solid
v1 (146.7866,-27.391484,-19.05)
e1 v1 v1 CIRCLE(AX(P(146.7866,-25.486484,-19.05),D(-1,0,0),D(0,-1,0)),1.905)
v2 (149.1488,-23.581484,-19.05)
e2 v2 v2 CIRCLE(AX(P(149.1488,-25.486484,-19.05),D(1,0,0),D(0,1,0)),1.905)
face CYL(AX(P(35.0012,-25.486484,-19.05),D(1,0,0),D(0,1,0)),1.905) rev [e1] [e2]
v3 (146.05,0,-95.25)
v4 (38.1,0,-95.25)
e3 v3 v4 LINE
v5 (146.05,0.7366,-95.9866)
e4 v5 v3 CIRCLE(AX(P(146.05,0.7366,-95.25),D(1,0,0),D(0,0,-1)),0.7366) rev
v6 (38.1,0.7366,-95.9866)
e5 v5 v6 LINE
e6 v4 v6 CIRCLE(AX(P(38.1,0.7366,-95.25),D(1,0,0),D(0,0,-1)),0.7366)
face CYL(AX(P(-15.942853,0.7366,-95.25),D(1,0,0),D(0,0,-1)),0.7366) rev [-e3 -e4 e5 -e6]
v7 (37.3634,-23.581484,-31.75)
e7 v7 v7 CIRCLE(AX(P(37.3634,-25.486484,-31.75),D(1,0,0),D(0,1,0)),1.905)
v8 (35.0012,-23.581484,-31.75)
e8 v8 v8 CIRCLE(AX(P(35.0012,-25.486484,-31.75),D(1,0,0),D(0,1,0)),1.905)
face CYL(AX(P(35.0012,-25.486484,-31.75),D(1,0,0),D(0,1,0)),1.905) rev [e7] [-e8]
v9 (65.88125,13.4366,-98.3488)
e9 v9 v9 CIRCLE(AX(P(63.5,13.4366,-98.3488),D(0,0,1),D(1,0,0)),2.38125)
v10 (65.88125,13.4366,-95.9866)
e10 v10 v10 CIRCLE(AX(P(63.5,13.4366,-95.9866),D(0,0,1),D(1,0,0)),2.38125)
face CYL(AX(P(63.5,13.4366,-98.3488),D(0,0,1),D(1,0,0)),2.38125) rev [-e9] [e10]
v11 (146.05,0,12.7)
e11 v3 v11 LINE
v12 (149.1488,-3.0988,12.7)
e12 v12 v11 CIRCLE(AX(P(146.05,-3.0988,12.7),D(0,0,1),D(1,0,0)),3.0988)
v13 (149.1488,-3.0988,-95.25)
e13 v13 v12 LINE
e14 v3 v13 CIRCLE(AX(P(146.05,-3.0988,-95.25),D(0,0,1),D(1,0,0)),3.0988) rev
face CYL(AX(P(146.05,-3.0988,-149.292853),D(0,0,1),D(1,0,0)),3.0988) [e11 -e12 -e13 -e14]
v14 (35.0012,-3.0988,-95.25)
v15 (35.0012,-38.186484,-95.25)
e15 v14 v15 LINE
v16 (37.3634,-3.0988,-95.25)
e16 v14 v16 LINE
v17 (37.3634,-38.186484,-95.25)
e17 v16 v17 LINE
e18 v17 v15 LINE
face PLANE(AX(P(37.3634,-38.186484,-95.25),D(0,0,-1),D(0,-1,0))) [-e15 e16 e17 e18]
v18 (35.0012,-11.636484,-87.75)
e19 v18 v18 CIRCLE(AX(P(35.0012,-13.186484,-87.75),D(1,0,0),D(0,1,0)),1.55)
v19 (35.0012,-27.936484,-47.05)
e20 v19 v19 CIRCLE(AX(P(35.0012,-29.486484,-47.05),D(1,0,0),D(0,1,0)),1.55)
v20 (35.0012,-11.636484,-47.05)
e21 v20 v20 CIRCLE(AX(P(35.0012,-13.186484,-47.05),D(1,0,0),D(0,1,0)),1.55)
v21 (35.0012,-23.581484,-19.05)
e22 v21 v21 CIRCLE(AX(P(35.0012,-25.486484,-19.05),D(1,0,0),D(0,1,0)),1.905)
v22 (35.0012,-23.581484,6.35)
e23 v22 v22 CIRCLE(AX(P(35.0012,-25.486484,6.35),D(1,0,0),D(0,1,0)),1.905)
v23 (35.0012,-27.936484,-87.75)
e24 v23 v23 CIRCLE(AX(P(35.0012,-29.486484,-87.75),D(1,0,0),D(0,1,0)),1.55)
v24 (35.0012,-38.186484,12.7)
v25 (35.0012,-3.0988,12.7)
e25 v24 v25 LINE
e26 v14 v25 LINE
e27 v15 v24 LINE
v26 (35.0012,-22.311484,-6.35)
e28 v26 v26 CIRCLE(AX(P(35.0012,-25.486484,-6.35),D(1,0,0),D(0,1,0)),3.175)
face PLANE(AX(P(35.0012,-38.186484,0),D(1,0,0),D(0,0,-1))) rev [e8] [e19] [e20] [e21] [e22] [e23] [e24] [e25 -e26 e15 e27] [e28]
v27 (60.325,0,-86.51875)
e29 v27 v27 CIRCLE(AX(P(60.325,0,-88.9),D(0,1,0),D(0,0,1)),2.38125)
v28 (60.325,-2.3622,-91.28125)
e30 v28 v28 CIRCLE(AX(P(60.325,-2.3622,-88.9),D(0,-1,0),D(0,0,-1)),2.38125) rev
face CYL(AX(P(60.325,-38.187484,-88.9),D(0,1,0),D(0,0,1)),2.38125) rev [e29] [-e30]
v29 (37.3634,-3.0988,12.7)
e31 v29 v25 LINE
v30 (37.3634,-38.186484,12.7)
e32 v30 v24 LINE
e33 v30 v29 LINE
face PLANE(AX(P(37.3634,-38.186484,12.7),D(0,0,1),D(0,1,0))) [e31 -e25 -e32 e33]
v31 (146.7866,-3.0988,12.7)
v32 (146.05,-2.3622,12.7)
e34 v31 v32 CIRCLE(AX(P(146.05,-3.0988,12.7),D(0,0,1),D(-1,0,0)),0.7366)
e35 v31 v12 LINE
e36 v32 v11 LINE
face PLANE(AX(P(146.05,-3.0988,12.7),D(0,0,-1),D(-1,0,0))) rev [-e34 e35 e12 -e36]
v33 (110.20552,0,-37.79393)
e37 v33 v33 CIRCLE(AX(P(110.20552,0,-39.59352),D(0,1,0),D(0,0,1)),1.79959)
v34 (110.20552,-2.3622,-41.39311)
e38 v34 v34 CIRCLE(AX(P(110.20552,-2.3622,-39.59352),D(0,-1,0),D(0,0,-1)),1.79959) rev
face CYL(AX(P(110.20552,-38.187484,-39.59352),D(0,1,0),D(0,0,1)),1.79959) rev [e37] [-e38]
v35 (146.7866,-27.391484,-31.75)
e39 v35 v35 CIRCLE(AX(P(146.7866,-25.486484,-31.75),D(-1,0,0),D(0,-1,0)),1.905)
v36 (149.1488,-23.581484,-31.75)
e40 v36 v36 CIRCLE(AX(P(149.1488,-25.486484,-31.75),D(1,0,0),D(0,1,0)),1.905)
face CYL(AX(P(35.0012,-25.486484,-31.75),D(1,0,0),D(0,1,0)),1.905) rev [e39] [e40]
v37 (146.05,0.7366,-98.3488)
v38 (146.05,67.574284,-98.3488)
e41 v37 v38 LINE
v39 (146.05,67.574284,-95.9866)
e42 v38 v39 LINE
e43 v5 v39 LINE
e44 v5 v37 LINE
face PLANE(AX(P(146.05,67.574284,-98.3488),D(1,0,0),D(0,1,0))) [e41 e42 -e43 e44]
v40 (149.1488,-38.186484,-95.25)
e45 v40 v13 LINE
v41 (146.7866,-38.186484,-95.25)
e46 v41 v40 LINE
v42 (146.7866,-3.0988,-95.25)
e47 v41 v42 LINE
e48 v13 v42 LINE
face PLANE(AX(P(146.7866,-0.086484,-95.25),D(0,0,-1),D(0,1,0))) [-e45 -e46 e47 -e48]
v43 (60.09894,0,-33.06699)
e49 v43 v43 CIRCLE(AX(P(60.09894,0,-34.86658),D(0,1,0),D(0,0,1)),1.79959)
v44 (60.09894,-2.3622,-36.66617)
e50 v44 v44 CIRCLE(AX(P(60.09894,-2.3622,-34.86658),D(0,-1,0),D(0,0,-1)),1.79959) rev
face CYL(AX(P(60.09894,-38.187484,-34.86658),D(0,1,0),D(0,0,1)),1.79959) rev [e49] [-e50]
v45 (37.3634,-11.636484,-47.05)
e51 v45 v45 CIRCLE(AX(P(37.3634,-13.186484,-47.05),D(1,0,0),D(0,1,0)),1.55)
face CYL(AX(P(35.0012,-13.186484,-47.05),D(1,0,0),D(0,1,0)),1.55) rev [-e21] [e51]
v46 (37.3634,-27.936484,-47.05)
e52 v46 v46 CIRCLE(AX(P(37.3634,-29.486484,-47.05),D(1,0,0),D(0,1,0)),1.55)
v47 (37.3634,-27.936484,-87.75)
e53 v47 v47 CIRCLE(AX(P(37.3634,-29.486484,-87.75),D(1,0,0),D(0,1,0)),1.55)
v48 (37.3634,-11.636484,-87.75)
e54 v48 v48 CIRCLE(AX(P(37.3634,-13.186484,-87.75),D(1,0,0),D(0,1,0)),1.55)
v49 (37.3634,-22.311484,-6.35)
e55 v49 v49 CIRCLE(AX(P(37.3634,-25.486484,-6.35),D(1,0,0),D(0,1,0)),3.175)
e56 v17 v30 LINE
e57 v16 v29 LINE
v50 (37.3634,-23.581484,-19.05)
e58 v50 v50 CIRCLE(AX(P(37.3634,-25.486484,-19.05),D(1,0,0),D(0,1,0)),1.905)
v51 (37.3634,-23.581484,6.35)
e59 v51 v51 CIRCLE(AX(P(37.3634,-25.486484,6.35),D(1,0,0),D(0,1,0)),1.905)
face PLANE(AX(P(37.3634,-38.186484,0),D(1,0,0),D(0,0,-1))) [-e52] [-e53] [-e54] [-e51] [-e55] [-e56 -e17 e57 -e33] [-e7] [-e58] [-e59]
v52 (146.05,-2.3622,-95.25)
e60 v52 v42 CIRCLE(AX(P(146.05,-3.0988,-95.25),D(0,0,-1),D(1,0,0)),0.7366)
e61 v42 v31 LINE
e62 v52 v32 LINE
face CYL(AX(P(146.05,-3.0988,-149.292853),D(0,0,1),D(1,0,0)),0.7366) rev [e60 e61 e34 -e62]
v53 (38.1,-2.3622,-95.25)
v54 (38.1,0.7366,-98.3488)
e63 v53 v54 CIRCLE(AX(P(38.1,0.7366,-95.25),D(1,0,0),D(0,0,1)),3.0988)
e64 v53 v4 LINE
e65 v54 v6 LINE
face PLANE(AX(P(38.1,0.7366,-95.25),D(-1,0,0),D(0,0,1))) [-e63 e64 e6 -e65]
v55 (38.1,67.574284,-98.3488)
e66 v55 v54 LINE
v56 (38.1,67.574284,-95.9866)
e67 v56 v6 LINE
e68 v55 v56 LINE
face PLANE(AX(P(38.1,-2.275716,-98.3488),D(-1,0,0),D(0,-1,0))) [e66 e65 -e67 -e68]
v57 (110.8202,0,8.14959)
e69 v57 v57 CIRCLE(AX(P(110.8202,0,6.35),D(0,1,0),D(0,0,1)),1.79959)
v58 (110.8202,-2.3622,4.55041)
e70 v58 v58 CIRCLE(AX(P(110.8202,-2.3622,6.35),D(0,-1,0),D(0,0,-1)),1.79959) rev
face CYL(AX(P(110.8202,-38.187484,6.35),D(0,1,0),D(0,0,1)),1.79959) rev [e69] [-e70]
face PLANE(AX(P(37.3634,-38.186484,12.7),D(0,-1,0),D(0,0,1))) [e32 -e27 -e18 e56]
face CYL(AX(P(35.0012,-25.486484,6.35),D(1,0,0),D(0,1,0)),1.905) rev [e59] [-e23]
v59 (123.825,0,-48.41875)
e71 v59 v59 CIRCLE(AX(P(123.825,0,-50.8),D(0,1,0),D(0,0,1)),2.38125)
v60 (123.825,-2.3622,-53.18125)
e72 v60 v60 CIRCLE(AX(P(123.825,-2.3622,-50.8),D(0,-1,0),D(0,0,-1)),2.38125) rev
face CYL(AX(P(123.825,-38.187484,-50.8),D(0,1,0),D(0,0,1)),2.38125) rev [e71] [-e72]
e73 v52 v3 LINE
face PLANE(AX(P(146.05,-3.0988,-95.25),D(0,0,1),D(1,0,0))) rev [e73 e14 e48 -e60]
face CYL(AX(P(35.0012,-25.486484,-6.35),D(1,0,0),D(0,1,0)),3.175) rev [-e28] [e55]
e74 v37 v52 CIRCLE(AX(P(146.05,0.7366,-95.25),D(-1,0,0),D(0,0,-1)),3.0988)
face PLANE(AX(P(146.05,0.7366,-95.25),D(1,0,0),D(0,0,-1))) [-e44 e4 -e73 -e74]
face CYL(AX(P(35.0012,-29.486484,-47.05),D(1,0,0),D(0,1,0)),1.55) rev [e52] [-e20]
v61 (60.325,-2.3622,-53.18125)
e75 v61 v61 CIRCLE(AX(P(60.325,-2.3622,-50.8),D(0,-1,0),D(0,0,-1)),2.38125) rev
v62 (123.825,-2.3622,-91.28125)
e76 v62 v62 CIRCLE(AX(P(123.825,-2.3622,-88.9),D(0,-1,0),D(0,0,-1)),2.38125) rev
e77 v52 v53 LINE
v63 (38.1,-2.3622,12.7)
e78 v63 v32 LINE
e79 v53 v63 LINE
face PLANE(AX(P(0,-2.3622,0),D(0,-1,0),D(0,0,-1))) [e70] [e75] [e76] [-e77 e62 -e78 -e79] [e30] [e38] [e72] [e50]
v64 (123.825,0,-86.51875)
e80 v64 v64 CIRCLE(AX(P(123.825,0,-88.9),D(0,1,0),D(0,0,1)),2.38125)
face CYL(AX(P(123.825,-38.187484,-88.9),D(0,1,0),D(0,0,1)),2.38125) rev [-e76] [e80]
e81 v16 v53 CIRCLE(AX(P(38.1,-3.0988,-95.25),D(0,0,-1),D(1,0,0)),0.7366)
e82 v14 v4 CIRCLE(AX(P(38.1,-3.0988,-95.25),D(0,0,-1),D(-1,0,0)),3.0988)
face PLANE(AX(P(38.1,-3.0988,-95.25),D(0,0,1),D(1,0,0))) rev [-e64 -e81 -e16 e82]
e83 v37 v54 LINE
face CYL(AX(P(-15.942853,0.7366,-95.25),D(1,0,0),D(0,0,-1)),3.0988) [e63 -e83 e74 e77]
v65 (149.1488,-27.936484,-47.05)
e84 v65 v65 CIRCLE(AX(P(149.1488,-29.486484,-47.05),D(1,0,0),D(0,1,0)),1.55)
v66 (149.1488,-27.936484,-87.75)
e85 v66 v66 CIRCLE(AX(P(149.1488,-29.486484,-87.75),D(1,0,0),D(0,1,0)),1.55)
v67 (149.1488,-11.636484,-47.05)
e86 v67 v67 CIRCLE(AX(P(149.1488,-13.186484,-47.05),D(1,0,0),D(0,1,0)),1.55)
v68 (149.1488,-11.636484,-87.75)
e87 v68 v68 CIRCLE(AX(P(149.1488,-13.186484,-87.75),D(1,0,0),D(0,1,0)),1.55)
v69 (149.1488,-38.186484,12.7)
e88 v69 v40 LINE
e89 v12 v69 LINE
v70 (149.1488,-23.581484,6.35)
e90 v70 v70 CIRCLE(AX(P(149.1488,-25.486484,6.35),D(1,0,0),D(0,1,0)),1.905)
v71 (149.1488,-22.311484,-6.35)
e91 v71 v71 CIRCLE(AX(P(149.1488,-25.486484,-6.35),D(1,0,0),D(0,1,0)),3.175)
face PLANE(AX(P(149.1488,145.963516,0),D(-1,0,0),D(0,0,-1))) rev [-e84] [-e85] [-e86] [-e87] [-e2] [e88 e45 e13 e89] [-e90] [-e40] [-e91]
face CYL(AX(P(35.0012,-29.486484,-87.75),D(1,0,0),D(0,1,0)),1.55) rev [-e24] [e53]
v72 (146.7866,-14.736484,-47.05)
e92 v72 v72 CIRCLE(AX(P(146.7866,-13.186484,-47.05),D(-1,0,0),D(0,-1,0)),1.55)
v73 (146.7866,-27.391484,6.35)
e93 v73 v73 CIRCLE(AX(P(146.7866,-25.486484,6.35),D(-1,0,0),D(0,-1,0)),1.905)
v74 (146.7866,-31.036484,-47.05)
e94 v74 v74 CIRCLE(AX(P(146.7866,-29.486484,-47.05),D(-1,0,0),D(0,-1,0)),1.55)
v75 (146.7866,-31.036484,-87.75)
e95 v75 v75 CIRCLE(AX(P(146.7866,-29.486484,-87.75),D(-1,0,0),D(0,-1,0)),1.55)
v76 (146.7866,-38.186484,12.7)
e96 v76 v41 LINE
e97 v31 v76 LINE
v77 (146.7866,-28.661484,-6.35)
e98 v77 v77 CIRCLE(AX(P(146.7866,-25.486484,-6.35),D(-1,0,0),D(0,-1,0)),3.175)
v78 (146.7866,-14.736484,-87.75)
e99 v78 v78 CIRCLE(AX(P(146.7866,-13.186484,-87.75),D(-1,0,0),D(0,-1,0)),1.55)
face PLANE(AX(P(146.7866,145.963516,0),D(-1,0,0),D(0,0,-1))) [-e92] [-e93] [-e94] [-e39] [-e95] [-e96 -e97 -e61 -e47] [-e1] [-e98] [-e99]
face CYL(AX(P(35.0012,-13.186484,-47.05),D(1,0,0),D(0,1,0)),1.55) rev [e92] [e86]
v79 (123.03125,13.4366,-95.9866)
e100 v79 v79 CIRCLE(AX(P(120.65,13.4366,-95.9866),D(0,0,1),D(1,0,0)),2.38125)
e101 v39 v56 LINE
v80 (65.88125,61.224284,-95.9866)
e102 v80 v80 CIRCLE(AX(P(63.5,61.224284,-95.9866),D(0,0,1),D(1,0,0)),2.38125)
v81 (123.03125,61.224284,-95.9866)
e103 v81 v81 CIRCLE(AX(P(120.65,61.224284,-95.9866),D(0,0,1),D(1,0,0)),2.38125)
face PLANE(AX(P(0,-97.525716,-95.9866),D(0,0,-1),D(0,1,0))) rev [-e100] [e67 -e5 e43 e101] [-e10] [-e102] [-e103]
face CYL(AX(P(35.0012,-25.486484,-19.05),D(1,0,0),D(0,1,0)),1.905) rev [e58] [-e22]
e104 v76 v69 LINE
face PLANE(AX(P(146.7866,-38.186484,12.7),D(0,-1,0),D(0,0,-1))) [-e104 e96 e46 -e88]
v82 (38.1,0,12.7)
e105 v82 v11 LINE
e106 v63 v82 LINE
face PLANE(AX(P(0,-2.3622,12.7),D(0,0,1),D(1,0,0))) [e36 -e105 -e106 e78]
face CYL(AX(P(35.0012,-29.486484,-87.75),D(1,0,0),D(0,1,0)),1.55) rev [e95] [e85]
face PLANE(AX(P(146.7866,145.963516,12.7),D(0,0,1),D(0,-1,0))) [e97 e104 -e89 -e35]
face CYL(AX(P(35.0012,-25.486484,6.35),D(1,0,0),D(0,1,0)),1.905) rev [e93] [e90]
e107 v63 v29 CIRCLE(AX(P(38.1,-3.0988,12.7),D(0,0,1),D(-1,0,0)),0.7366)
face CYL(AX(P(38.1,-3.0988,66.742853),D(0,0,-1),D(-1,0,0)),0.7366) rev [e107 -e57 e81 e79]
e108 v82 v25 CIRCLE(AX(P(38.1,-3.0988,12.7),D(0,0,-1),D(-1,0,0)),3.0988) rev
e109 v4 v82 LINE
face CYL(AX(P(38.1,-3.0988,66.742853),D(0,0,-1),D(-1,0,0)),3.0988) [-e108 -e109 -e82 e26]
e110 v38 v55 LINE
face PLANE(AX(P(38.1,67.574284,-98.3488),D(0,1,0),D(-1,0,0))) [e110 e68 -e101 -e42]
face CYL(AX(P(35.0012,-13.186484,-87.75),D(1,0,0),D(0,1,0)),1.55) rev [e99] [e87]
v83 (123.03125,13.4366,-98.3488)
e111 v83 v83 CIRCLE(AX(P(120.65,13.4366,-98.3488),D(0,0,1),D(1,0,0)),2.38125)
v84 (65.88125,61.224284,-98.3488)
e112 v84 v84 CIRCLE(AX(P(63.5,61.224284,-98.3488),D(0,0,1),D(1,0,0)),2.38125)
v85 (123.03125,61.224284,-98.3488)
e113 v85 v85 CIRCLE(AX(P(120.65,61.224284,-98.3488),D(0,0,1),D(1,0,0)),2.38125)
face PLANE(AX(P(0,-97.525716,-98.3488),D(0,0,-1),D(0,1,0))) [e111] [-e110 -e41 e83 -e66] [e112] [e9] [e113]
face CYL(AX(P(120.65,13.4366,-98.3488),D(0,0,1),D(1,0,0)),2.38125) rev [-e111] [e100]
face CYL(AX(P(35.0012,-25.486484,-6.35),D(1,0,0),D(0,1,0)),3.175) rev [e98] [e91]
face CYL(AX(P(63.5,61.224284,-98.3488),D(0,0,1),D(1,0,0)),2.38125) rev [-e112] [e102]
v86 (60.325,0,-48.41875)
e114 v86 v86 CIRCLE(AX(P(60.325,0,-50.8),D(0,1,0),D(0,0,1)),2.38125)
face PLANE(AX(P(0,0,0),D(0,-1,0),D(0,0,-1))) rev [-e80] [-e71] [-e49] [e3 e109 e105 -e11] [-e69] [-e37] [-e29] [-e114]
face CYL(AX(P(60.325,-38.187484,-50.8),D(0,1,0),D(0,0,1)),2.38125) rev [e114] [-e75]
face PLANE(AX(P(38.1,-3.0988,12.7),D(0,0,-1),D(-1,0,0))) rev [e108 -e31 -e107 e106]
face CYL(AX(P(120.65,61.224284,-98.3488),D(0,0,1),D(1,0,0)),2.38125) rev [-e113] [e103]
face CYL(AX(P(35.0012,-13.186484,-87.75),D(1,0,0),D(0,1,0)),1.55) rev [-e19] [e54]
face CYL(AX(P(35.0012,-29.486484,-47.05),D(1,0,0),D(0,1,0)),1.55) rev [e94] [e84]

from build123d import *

# Parameters (mm, degrees)
BASE_FLANGE2_DEPTH     = 2.3622
SKETCHED_START         = -95.25
SKETCHED_BEND2_DEPTH   = 107.95
SKETCHED_BEND2_2_DEPTH = 107.95
SKETCHED_START_2       = 38.1
SKETCHED_BEND3_DEPTH   = 107.95
SKETCHED_BEND3_2_DEPTH = 107.95
SKETCH15_R             = 3.175
SKETCH15_R_2           = 1.905
SKETCH15_R_3           = 1.55
CUT_EXTRUDE1_DEPTH     = 166.131598701
SKETCH16_R             = 2.38125
CUT_EXTRUDE2_DEPTH     = 197.530978228
CUT_EXTRUDE3_REACH     = 193.008
SKETCH18_R             = 2.38125
SKETCH18_R_2           = 1.79959


# Read off the part's stored shape, not the designer's step: Sketched Bend2, Sketched Bend3
# Sheet-metal steps are written as plain solids
with BuildPart() as part:
    # Sketch7 → Base-Flange2 (new body)
    with BuildSketch(Plane(origin=(0, 0, 0), x_dir=(1, 0, 0), z_dir=(0, 1, 0))):
        Polygon((38.1, 95.25), (38.1, 165.1), (146.05, 165.1), (146.05, 95.25), (184.15, 95.25), (184.15, -12.7), (0, -12.7), (0, 95.25), align=None)
    extrude(amount=-BASE_FLANGE2_DEPTH)

    # Sketched Bend2 outline → Sketched Bend2 (cut)
    with BuildSketch(Plane.XY.offset(SKETCHED_START)):
        with BuildLine():
            Line((0, -2.3622), (35.090019621, -2.3622))
            ThreePointArc((35.090019621, -2.3622), (36.186889266, -0.661061548), (38.1, 0))
            Line((38.1, 0), (0, 0))
            Line((0, 0), (0, -2.3622))
        make_face()
        with BuildLine():
            ThreePointArc((146.05, 0), (147.963110734, -0.661061548), (149.059980379, -2.3622))
            Line((149.059980379, -2.3622), (184.15, -2.3622))
            Line((184.15, -2.3622), (184.15, 0))
            Line((184.15, 0), (146.05, 0))
        make_face()
    extrude(amount=SKETCHED_BEND2_DEPTH, mode=Mode.SUBTRACT)

    # Sketched Bend2 2 outline → Sketched Bend2 2 (add)
    with BuildSketch(Plane.XY.offset(SKETCHED_START)):
        with BuildLine():
            Line((37.3634, -38.186483884), (37.3634, -3.0988))
            ThreePointArc((37.3634, -3.0988), (37.579145145, -2.577945145), (38.1, -2.3622))
            Line((38.1, -2.3622), (35.090019621, -2.3622))
            ThreePointArc((35.090019621, -2.3622), (35.023485037, -2.727832183), (35.0012, -3.0988))
            Line((35.0012, -3.0988), (35.0012, -38.186483884))
            Line((35.0012, -38.186483884), (37.3634, -38.186483884))
        make_face()
        with BuildLine():
            Line((149.059980379, -2.3622), (146.05, -2.3622))
            ThreePointArc((146.05, -2.3622), (146.570854855, -2.577945145), (146.7866, -3.0988))
            Line((146.7866, -3.0988), (146.7866, -38.186483884))
            Line((146.7866, -38.186483884), (149.1488, -38.186483884))
            Line((149.1488, -38.186483884), (149.1488, -3.0988))
            ThreePointArc((149.1488, -3.0988), (149.126514963, -2.727832183), (149.059980379, -2.3622))
        make_face()
    extrude(amount=SKETCHED_BEND2_2_DEPTH)

    # Sketched Bend3 outline → Sketched Bend3 (cut)
    with BuildSketch(Plane.YZ.offset(SKETCHED_START_2)):
        with BuildLine():
            ThreePointArc((0, -98.259980379), (-1.701138452, -97.163110734), (-2.3622, -95.25))
            Line((-2.3622, -95.25), (-2.3622, -165.1))
            Line((-2.3622, -165.1), (0, -165.1))
            Line((0, -165.1), (0, -98.259980379))
        make_face()
    extrude(amount=SKETCHED_BEND3_DEPTH, mode=Mode.SUBTRACT)

    # Sketched Bend3 2 outline → Sketched Bend3 2 (add)
    with BuildSketch(Plane.YZ.offset(SKETCHED_START_2)):
        with BuildLine():
            Line((0, -95.25), (0, -98.259980379))
            ThreePointArc((0, -98.259980379), (0.365632183, -98.326514963), (0.7366, -98.3488))
            Line((0.7366, -98.3488), (67.574283884, -98.3488))
            Line((67.574283884, -98.3488), (67.574283884, -95.9866))
            Line((67.574283884, -95.9866), (0.7366, -95.9866))
            ThreePointArc((0.7366, -95.9866), (0.215745145, -95.770854855), (0, -95.25))
        make_face()
    extrude(amount=SKETCHED_BEND3_2_DEPTH)

    # Sketch15 → Cut-Extrude1 (cut, through all)
    with BuildSketch(Plane(origin=(149.1488, 0, 0), x_dir=(0, 0, -1), z_dir=(1, 0, 0))):
        with Locations(Location((6.35, -25.486483884, 0), (0, 0, 90))):
            Circle(SKETCH15_R)
        with Locations(Location((19.05, -25.486483884, 0), (0, 0, 90))):
            Circle(SKETCH15_R_2)
        with Locations(Location((31.75, -25.486483884, 0), (0, 0, 90))):
            Circle(SKETCH15_R_2)
        with Locations(Location((-6.35, -25.486483884, 0), (0, 0, 90))):
            Circle(SKETCH15_R_2)
        with Locations(Location((87.75, -13.186483884, 0), (0, 0, 90))):
            Circle(SKETCH15_R_3)
        with Locations(Location((47.05, -29.486483884, 0), (0, 0, 90))):
            Circle(SKETCH15_R_3)
        with Locations(Location((87.75, -29.486483884, 0), (0, 0, 90))):
            Circle(SKETCH15_R_3)
        with Locations(Location((47.05, -13.186483884, 0), (0, 0, 90))):
            Circle(SKETCH15_R_3)
    extrude(amount=-CUT_EXTRUDE1_DEPTH, mode=Mode.SUBTRACT)

    # Sketch16 → Cut-Extrude2 (cut, through all)
    with BuildSketch(Plane.XY.offset(-95.9866)):
        with Locations((63.5, 61.224283884)):
            Circle(SKETCH16_R)
        with Locations((120.65, 61.224283884)):
            Circle(SKETCH16_R)
        with Locations((63.5, 13.4366)):
            Circle(SKETCH16_R)
        with Locations((120.65, 13.4366)):
            Circle(SKETCH16_R)
    extrude(amount=-CUT_EXTRUDE2_DEPTH, mode=Mode.SUBTRACT)

    # Sketch18 → Cut-Extrude3 (cut, up to next)
    with BuildSketch(Plane(origin=(0, 0, 0), x_dir=(1, 0, 0), z_dir=(0, 1, 0)), mode=Mode.PRIVATE) as cut_extrude3_sk1:
        with Locations(Location((60.325, 88.9, 0), (0, 0, 270))):
            Circle(SKETCH18_R)
    cut_extrude3_tool1 = extrude(cut_extrude3_sk1.sketch, amount=-CUT_EXTRUDE3_REACH, mode=Mode.PRIVATE) & part.part
    # Sketch18 → Cut-Extrude3 (cut, up to next)
    with BuildSketch(Plane(origin=(0, 0, 0), x_dir=(1, 0, 0), z_dir=(0, 1, 0)), mode=Mode.PRIVATE) as cut_extrude3_sk2:
        with Locations(Location((123.825, 88.9, 0), (0, 0, 270))):
            Circle(SKETCH18_R)
    cut_extrude3_tool2 = extrude(cut_extrude3_sk2.sketch, amount=-CUT_EXTRUDE3_REACH, mode=Mode.PRIVATE) & part.part
    # Sketch18 → Cut-Extrude3 (cut, up to next)
    with BuildSketch(Plane(origin=(0, 0, 0), x_dir=(1, 0, 0), z_dir=(0, 1, 0)), mode=Mode.PRIVATE) as cut_extrude3_sk3:
        with Locations(Location((60.325, 50.8, 0), (0, 0, 270))):
            Circle(SKETCH18_R)
    cut_extrude3_tool3 = extrude(cut_extrude3_sk3.sketch, amount=-CUT_EXTRUDE3_REACH, mode=Mode.PRIVATE) & part.part
    # Sketch18 → Cut-Extrude3 (cut, up to next)
    with BuildSketch(Plane(origin=(0, 0, 0), x_dir=(1, 0, 0), z_dir=(0, 1, 0)), mode=Mode.PRIVATE) as cut_extrude3_sk4:
        with Locations(Location((123.825, 50.8, 0), (0, 0, 270))):
            Circle(SKETCH18_R)
    cut_extrude3_tool4 = extrude(cut_extrude3_sk4.sketch, amount=-CUT_EXTRUDE3_REACH, mode=Mode.PRIVATE) & part.part
    # Sketch18 → Cut-Extrude3 (cut, up to next)
    with BuildSketch(Plane(origin=(0, 0, 0), x_dir=(1, 0, 0), z_dir=(0, 1, 0)), mode=Mode.PRIVATE) as cut_extrude3_sk5:
        with Locations(Location((60.09894, 34.86658, 0), (0, 0, 270))):
            Circle(SKETCH18_R_2)
    cut_extrude3_tool5 = extrude(cut_extrude3_sk5.sketch, amount=-CUT_EXTRUDE3_REACH, mode=Mode.PRIVATE) & part.part
    # Sketch18 → Cut-Extrude3 (cut, up to next)
    with BuildSketch(Plane(origin=(0, 0, 0), x_dir=(1, 0, 0), z_dir=(0, 1, 0)), mode=Mode.PRIVATE) as cut_extrude3_sk6:
        with Locations(Location((110.20552, 39.59352, 0), (0, 0, 270))):
            Circle(SKETCH18_R_2)
    cut_extrude3_tool6 = extrude(cut_extrude3_sk6.sketch, amount=-CUT_EXTRUDE3_REACH, mode=Mode.PRIVATE) & part.part
    # Sketch18 → Cut-Extrude3 (cut, up to next)
    with BuildSketch(Plane(origin=(0, 0, 0), x_dir=(1, 0, 0), z_dir=(0, 1, 0)), mode=Mode.PRIVATE) as cut_extrude3_sk7:
        with Locations(Location((110.8202, -6.35, 0), (0, 0, 270))):
            Circle(SKETCH18_R_2)
    cut_extrude3_tool7 = extrude(cut_extrude3_sk7.sketch, amount=-CUT_EXTRUDE3_REACH, mode=Mode.PRIVATE) & part.part
    add(cut_extrude3_tool1.solids().sort_by_distance((60.325, 0, -88.9))[0], mode=Mode.SUBTRACT)
    add(cut_extrude3_tool2.solids().sort_by_distance((123.825, 0, -88.9))[0], mode=Mode.SUBTRACT)
    add(cut_extrude3_tool3.solids().sort_by_distance((60.325, 0, -50.8))[0], mode=Mode.SUBTRACT)
    add(cut_extrude3_tool4.solids().sort_by_distance((123.825, 0, -50.8))[0], mode=Mode.SUBTRACT)
    add(cut_extrude3_tool5.solids().sort_by_distance((60.09894, 0, -34.86658))[0], mode=Mode.SUBTRACT)
    add(cut_extrude3_tool6.solids().sort_by_distance((110.20552, 0, -39.59352))[0], mode=Mode.SUBTRACT)
    add(cut_extrude3_tool7.solids().sort_by_distance((110.8202, 0, 6.35))[0], mode=Mode.SUBTRACT)


solid = part.part
